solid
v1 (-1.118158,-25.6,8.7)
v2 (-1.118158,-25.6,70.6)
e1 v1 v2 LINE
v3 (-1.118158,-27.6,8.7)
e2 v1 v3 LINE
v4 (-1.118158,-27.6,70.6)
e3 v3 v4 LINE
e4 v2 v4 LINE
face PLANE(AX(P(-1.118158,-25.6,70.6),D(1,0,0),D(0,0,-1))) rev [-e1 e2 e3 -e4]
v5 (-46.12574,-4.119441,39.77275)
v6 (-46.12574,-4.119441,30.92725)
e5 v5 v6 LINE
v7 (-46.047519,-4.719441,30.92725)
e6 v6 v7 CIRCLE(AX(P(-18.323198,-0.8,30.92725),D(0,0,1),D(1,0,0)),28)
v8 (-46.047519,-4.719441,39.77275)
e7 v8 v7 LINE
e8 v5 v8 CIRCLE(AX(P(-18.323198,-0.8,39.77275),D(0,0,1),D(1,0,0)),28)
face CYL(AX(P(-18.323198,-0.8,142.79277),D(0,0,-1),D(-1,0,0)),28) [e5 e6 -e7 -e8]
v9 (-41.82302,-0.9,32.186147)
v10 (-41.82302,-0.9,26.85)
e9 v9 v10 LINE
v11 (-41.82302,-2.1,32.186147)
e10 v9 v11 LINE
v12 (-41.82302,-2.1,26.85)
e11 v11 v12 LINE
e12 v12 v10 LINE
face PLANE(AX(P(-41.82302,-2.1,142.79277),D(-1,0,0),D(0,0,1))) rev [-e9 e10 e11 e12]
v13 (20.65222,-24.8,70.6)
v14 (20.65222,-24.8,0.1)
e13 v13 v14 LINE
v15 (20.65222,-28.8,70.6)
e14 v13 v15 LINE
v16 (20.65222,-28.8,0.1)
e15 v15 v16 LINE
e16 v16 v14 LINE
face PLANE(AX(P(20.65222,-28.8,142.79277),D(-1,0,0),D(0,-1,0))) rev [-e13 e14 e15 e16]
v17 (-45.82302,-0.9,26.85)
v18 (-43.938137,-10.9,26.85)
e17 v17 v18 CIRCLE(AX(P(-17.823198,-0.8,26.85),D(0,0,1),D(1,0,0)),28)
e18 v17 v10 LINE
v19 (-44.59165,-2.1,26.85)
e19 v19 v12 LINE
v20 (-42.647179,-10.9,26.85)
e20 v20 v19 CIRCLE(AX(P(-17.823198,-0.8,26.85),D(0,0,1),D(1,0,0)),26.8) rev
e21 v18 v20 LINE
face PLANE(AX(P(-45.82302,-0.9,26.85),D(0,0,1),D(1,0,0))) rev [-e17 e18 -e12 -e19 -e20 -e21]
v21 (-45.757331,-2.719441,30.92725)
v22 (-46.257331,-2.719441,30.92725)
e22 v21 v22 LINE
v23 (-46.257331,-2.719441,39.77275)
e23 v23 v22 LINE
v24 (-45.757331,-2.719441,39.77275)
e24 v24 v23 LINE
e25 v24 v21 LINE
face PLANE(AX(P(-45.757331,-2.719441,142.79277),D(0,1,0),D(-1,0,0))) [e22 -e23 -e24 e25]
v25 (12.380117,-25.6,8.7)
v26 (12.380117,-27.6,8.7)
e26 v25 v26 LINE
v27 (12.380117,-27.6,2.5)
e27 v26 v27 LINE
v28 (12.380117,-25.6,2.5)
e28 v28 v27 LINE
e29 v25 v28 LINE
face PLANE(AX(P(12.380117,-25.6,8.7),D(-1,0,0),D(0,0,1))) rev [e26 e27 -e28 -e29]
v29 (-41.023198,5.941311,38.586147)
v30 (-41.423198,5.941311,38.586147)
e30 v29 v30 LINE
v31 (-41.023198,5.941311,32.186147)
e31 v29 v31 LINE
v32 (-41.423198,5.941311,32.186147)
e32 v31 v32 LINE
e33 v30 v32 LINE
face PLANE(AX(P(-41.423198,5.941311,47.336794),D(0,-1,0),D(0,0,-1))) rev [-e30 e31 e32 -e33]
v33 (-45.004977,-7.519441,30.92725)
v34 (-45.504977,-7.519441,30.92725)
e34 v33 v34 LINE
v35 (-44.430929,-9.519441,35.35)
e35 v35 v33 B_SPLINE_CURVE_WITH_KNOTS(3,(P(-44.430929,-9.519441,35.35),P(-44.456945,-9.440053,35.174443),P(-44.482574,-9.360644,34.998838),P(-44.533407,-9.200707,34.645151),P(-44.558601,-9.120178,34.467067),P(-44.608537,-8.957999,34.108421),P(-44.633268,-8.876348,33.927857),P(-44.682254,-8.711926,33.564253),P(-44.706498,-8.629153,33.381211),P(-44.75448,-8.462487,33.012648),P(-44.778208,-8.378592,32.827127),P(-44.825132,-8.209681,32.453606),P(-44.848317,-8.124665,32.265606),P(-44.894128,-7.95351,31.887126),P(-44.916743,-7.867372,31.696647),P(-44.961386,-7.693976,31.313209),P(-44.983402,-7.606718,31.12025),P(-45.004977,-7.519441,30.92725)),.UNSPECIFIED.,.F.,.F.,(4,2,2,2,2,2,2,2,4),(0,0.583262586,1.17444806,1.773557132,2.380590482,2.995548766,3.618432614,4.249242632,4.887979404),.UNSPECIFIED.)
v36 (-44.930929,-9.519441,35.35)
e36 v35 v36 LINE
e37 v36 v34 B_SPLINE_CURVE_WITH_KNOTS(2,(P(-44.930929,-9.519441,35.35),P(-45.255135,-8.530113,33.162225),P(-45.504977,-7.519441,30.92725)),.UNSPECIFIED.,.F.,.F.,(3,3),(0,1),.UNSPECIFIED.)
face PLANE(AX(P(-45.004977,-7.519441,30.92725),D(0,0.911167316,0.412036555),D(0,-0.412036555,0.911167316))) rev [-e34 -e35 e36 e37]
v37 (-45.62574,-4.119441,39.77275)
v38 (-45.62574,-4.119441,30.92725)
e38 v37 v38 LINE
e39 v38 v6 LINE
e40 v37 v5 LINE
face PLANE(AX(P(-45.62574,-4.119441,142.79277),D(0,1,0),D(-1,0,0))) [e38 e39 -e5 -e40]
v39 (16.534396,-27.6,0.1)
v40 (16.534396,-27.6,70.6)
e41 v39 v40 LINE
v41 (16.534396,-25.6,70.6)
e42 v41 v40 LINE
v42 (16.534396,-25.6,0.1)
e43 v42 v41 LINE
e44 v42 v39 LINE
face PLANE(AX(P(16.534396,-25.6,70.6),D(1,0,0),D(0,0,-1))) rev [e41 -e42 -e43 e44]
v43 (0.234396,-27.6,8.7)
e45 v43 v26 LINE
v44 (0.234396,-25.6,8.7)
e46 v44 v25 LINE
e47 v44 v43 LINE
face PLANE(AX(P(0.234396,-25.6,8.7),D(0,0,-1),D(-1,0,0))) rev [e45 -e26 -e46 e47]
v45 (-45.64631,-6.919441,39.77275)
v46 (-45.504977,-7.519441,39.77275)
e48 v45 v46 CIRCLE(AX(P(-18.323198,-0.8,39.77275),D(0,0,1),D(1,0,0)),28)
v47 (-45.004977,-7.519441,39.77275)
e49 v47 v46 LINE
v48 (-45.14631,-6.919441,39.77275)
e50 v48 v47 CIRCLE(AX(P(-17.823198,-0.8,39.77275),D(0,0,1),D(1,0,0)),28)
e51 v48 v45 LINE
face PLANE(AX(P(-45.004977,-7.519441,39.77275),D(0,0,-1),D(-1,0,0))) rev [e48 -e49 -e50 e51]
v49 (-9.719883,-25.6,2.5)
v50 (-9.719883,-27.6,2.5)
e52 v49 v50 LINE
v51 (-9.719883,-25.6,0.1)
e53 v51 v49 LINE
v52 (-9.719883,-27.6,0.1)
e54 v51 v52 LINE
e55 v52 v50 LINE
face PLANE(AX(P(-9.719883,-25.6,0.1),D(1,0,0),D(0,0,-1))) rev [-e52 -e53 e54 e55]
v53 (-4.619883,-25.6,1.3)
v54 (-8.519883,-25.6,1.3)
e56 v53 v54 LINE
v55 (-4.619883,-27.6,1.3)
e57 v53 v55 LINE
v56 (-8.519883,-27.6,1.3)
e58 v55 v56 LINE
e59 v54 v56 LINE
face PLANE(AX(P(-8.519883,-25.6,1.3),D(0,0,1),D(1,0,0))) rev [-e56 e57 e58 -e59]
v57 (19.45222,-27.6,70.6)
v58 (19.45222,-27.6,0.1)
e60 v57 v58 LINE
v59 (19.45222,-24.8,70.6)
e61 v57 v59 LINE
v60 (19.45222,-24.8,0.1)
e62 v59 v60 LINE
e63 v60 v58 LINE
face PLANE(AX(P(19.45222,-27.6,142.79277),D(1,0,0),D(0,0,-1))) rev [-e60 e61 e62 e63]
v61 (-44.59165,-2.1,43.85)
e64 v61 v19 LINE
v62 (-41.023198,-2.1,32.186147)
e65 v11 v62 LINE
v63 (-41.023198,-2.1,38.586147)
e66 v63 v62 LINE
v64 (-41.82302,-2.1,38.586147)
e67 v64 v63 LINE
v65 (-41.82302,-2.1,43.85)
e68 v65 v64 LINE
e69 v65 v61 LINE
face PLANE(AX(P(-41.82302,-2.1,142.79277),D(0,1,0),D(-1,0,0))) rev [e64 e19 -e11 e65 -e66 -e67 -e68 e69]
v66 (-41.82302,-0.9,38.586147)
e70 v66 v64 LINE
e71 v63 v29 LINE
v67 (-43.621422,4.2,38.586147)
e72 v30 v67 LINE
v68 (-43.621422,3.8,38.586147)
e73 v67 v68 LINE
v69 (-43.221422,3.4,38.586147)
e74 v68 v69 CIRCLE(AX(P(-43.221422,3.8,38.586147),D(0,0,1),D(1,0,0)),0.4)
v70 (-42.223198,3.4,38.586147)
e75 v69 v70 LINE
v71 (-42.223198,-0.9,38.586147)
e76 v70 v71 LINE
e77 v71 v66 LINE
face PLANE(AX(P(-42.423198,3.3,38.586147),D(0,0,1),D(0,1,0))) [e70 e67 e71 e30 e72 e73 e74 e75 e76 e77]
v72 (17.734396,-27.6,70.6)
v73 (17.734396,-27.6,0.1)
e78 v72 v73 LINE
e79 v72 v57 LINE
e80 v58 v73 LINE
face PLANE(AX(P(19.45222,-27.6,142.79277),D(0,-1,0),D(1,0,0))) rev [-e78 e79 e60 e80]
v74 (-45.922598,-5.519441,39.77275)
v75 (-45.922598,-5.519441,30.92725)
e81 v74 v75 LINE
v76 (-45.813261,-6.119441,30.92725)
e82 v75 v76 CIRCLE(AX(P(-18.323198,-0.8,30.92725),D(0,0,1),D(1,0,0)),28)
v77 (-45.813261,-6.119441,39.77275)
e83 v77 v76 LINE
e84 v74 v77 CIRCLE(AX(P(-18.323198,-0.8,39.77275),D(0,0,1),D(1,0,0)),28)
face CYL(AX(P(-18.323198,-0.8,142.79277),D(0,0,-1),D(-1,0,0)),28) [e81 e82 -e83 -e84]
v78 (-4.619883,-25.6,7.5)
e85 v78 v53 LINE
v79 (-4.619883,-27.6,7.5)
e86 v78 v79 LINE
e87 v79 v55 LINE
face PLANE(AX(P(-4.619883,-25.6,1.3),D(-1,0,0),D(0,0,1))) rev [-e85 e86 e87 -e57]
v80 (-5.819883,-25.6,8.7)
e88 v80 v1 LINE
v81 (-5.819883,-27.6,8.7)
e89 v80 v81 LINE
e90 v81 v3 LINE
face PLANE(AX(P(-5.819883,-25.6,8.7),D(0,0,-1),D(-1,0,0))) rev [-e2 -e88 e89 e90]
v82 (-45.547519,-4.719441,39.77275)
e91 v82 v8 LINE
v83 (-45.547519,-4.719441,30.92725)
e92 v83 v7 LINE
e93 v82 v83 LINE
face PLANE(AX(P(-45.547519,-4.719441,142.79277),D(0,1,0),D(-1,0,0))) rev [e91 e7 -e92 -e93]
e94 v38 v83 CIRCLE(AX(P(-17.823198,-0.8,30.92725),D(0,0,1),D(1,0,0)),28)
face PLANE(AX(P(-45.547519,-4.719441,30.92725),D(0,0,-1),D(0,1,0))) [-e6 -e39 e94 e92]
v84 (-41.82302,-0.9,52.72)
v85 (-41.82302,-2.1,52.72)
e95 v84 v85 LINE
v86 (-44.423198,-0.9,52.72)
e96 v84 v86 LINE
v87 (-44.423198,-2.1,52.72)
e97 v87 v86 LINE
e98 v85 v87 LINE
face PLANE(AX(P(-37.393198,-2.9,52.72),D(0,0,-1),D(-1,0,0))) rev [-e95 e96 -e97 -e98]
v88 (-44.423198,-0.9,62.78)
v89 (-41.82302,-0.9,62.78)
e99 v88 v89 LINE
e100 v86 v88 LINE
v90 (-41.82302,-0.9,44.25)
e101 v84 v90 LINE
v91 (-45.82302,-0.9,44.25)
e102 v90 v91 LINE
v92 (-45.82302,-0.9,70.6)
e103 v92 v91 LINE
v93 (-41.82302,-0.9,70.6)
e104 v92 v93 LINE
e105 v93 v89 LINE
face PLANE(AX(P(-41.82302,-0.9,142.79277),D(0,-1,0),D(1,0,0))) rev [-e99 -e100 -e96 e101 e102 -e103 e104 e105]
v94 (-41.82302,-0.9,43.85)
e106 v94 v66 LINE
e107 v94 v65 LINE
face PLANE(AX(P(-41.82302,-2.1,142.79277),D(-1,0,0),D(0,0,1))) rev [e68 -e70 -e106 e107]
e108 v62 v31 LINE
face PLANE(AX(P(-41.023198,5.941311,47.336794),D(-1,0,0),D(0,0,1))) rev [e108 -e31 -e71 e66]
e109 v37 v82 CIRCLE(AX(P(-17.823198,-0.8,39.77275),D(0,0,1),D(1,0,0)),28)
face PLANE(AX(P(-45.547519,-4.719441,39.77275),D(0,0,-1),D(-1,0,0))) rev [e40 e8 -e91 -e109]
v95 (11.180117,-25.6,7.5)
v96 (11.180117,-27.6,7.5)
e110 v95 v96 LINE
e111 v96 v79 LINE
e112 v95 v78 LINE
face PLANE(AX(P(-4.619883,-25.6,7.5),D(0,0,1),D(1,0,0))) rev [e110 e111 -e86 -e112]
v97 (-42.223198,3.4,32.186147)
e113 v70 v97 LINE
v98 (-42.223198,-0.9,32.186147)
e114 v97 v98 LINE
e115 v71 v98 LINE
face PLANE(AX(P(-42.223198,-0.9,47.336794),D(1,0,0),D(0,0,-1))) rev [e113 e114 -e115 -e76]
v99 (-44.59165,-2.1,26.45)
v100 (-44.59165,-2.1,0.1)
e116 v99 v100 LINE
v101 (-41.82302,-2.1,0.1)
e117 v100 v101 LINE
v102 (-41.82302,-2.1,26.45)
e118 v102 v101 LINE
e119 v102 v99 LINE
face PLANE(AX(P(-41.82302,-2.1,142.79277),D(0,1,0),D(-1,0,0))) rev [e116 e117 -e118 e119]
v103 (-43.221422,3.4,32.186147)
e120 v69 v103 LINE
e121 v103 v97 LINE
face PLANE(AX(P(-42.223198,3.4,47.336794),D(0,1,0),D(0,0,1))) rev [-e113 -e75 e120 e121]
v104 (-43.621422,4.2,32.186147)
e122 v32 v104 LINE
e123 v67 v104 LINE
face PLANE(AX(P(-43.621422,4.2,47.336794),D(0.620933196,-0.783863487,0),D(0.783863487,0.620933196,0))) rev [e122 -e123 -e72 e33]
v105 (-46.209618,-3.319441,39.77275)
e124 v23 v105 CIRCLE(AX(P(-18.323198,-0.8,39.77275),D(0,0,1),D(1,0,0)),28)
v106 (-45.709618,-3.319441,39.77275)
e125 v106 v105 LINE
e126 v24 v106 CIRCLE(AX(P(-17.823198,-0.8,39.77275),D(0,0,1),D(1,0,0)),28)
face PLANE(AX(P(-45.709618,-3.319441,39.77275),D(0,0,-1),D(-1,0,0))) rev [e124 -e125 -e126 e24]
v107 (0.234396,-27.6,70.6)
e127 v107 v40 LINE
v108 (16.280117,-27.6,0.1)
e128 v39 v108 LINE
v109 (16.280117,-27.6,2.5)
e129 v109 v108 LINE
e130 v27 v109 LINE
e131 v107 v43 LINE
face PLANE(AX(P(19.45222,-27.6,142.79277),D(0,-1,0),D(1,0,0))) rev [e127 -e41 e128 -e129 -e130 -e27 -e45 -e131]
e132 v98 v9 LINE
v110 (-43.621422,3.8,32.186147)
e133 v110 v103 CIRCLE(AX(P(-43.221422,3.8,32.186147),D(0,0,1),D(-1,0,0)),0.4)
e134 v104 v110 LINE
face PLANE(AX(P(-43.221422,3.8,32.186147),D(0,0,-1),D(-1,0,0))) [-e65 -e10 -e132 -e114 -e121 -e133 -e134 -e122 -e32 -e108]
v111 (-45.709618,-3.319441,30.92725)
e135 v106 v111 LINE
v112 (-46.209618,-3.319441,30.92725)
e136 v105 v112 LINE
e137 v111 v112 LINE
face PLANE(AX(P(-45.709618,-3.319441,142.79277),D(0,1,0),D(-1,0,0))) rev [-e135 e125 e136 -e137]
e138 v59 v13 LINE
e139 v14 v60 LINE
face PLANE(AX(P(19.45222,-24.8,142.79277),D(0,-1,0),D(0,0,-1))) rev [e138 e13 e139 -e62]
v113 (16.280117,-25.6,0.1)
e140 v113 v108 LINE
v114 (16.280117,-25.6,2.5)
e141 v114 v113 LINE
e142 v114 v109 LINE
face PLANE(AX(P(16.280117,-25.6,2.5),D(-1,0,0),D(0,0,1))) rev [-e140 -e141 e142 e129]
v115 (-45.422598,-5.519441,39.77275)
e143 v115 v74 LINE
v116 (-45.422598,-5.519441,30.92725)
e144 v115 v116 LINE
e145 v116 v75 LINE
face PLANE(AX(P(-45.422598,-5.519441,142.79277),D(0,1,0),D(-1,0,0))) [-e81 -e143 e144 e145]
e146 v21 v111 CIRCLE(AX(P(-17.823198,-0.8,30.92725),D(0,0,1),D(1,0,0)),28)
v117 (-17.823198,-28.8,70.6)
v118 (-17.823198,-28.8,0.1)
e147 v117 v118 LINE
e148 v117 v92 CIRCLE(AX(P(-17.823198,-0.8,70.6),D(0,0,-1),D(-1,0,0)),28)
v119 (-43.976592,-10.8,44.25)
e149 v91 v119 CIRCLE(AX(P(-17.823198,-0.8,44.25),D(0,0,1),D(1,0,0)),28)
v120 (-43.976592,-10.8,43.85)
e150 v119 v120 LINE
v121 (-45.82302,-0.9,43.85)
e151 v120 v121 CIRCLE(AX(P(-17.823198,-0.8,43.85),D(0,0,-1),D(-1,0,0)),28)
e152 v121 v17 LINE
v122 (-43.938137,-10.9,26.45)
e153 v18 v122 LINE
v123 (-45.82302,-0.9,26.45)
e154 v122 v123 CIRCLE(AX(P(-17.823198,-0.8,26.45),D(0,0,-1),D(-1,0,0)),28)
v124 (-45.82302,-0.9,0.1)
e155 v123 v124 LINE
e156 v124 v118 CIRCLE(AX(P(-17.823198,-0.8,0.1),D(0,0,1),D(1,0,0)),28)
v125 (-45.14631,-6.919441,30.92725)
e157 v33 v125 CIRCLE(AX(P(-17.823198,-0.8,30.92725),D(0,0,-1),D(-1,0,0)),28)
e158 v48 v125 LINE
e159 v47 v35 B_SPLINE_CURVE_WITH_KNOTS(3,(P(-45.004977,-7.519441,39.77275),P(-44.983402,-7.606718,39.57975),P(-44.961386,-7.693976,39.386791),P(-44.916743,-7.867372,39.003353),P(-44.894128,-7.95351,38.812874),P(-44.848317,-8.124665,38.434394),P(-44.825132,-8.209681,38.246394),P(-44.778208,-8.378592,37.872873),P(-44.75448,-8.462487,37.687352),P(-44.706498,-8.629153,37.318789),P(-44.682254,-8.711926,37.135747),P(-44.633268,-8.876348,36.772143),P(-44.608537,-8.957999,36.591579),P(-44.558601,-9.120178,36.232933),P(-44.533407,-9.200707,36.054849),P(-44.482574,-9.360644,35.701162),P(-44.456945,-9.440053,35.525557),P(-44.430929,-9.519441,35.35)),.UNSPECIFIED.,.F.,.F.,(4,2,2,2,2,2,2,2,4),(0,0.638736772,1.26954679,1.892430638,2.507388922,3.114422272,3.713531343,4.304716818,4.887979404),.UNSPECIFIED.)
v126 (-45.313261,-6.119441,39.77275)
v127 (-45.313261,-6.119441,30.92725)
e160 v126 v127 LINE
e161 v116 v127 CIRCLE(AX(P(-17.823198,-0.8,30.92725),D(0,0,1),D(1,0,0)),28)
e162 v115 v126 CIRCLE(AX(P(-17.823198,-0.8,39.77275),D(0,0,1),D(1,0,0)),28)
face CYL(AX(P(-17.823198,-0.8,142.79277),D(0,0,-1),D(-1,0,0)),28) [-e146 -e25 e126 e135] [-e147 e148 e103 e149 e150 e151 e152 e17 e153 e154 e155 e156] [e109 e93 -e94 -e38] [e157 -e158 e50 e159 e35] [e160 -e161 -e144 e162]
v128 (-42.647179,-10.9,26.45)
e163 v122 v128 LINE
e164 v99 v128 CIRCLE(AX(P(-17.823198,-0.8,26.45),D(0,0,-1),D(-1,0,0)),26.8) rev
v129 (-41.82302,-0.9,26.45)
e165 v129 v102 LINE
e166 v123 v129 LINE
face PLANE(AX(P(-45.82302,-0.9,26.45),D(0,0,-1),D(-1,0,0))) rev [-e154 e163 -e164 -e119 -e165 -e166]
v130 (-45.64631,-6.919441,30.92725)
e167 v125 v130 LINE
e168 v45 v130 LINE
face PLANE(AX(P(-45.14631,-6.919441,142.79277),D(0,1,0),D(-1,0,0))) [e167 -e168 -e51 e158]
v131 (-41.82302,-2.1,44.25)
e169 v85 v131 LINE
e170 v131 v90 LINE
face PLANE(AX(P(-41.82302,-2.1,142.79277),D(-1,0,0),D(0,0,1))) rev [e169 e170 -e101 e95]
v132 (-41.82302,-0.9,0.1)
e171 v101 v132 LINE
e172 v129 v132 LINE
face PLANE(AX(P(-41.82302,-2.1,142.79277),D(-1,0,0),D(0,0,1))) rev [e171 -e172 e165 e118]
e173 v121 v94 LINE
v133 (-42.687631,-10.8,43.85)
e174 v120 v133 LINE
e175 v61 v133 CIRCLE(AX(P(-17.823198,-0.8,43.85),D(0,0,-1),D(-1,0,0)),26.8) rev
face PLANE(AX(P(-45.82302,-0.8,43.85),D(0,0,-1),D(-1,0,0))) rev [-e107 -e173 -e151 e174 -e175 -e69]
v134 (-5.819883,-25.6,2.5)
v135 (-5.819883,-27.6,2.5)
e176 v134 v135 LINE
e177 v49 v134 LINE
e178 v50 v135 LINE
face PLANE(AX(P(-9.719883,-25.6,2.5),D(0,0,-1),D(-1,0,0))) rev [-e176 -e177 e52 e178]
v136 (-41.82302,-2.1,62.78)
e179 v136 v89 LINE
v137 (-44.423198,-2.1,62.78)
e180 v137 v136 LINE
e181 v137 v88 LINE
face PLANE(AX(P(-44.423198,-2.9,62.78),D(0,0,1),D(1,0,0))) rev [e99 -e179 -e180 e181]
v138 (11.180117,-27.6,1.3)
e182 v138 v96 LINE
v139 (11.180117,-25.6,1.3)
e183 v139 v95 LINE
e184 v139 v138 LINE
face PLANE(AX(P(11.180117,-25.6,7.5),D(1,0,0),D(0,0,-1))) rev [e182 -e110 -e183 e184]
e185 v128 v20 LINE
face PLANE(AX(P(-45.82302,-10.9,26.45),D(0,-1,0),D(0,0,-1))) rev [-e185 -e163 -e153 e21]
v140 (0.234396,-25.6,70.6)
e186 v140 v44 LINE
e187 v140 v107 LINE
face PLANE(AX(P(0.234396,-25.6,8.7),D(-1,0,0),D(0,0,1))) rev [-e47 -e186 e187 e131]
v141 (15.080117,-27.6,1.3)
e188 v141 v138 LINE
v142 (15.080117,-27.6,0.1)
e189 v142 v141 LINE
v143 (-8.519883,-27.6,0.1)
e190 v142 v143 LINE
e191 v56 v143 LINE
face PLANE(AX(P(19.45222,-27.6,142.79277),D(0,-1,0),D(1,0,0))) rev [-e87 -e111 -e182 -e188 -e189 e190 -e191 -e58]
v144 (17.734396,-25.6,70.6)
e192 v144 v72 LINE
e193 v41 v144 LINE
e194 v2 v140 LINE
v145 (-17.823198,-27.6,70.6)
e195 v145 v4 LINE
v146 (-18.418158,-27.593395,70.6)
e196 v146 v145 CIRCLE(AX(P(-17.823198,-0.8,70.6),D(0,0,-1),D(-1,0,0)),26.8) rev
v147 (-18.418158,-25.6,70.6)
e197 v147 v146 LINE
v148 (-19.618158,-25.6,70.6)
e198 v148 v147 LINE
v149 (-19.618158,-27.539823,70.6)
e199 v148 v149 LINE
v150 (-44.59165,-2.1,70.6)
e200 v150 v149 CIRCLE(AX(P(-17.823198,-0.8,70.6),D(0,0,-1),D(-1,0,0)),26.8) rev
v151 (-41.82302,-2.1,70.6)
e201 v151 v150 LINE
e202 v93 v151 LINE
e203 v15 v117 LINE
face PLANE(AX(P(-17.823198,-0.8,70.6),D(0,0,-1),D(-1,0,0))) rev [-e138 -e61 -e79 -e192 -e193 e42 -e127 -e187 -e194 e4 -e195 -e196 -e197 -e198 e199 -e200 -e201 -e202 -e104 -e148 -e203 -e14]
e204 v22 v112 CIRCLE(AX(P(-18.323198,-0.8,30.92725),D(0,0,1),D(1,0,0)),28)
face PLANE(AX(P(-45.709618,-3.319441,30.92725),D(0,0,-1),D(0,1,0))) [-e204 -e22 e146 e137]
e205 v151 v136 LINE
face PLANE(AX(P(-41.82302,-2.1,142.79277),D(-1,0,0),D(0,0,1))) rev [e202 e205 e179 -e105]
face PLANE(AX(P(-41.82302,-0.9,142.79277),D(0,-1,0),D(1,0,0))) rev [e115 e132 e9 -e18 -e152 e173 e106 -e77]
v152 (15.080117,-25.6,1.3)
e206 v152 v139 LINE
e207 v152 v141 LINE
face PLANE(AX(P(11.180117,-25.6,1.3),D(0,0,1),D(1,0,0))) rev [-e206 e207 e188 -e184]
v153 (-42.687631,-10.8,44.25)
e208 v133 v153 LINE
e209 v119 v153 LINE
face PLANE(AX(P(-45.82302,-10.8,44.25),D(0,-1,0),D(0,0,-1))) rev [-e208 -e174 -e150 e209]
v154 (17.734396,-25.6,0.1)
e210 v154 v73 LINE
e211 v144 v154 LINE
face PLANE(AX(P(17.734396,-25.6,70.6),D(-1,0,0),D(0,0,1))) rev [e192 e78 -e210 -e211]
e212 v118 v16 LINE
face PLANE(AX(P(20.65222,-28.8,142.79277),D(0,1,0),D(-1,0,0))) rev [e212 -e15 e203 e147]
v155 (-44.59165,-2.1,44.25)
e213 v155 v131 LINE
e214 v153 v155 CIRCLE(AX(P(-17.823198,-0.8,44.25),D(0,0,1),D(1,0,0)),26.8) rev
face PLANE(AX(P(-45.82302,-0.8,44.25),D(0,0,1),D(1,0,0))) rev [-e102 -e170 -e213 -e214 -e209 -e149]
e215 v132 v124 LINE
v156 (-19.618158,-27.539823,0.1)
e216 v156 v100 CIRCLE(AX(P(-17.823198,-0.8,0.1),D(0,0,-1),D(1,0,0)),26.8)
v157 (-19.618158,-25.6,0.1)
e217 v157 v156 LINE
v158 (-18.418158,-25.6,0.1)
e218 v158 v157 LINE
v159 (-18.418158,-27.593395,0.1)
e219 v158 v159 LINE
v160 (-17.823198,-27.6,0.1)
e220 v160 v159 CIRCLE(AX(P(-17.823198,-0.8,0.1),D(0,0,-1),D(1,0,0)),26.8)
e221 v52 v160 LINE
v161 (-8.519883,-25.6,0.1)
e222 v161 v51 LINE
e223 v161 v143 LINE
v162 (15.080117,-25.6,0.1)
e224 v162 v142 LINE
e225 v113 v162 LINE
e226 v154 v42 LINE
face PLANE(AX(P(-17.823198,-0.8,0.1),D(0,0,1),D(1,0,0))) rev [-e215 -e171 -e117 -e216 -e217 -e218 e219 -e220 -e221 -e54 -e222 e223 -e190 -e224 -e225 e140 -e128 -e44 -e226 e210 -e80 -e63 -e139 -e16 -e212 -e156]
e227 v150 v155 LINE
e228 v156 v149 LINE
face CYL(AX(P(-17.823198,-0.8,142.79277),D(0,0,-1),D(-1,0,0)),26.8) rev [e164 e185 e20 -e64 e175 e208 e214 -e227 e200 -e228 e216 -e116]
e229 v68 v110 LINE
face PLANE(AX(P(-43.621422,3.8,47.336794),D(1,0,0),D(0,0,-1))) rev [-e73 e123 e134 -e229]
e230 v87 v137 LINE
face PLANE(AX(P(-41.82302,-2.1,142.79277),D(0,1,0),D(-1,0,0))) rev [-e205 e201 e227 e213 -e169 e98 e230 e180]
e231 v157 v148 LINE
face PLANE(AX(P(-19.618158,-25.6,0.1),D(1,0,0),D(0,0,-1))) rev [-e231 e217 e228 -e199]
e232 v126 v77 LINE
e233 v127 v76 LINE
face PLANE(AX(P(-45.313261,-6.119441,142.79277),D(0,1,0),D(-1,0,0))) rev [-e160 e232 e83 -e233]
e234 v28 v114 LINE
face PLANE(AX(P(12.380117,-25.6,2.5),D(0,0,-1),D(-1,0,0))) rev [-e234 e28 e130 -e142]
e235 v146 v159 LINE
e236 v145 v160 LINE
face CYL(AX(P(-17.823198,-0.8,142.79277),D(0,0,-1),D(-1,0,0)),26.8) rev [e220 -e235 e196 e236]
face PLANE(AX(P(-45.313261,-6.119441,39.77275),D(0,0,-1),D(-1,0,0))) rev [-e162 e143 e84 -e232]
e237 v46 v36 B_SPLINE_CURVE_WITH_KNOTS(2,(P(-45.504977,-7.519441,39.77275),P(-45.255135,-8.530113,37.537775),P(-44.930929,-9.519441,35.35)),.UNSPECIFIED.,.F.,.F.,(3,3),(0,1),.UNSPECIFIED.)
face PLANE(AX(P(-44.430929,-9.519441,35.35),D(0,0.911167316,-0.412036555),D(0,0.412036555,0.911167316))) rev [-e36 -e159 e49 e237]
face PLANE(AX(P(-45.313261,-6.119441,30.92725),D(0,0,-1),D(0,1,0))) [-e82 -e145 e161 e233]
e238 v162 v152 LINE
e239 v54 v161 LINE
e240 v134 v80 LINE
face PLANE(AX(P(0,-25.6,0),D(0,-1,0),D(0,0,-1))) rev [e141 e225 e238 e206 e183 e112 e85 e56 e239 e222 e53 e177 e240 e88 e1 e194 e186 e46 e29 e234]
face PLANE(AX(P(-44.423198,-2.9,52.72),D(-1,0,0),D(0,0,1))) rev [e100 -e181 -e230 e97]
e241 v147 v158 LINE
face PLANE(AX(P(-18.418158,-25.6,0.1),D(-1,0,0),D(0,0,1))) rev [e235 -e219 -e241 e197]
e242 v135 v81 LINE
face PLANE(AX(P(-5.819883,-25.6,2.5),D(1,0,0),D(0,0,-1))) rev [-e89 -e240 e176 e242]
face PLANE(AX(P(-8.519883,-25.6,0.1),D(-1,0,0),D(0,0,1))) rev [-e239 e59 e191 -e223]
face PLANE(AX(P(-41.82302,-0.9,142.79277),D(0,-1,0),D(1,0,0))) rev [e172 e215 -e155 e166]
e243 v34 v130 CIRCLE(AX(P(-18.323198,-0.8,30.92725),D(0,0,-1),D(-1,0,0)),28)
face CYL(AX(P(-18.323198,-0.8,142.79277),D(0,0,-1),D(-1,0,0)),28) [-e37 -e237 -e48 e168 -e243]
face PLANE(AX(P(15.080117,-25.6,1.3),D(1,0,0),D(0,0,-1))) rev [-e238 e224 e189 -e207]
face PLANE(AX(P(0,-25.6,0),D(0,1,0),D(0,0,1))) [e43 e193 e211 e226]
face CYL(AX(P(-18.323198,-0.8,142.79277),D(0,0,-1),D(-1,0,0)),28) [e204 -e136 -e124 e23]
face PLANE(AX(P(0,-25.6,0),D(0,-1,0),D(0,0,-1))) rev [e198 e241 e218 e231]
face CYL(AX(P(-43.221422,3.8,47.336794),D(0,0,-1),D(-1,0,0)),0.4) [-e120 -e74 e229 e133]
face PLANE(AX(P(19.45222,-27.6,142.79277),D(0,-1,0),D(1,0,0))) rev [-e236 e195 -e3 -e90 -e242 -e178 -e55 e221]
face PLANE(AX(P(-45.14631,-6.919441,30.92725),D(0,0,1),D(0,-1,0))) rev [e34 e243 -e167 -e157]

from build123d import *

# Parameters (mm, degrees)
EXTRUDE_START          = 0.1
EXTRUDE_1_DEPTH        = 70.5
SKETCH_3_W             = 0.4
SKETCH_3_H             = 10
CUT_EXTRUDE_1_DEPTH    = 89.958131389
EXTRUDE_START_2        = 0.3
EXTRUDE_2_DEPTH        = 6.4
EXTRUDE_3_REACH        = 103.657
EXTRUDE_3_START_RADIUS = 28
EXTRUDE_3_END_RADIUS   = 28
SKETCH_5_W             = 8.845499788
SKETCH_5_H             = 0.6
SKETCH_6_W             = 1.2
SKETCH_6_H             = 70.5
EXTRUDE_4_DEPTH        = 2
SKETCH_7_W             = 7.03
SKETCH_7_H             = 10.06
CUT_EXTRUDE_2_DEPTH    = 2


# Read off the part's stored shape, not the designer's step: Бобышка-Вытянуть2
with BuildPart() as part:
    # Эскиз1 → Бобышка-Вытянуть1 (new body)
    with BuildSketch(Plane.XY.offset(EXTRUDE_START)):
        with BuildLine():
            Line((20.652219826, -28.8), (-17.823198335, -28.8))
            ThreePointArc((-17.823198335, -28.8), (-37.586801245, -20.634313701), (-45.823019763, -0.9))
            Line((-45.823019763, -0.9), (-41.823019763, -0.9))
            Line((-41.823019763, -0.9), (-41.823019763, -2.1))
            Line((-41.823019763, -2.1), (-44.591649915, -2.1))
            ThreePointArc((-44.591649915, -2.1), (-36.308327493, -20.204638621), (-17.823198335, -27.6))
            Line((-17.823198335, -27.6), (19.452219826, -27.6))
            Line((19.452219826, -27.6), (19.452219826, -24.8))
            Line((19.452219826, -24.8), (20.652219826, -24.8))
            Line((20.652219826, -24.8), (20.652219826, -28.8))
        make_face()
    extrude(amount=EXTRUDE_1_DEPTH)

    # Эскиз3 → Вырез-Вытянуть1 (cut, through all)
    with BuildSketch(Plane(origin=(0, 0, 0), x_dir=(0, 0, -1), z_dir=(1, 0, 0))):
        with Locations((-44.05, -5.8)):
            Rectangle(SKETCH_3_W, SKETCH_3_H)
        with Locations((-26.65, -5.9)):
            Rectangle(SKETCH_3_W, SKETCH_3_H)
    extrude(amount=-CUT_EXTRUDE_1_DEPTH, mode=Mode.SUBTRACT)

    # Бобышка-Вытянуть2 outline → Бобышка-Вытянуть2 (add)
    with BuildSketch(Plane.XY.offset(31.886146776).offset(EXTRUDE_START_2)):
        with BuildLine():
            Line((-41.823019763, -2.1), (-41.023198335, -2.1))
            Line((-41.023198335, -2.1), (-41.023198335, 5.941310574))
            Line((-41.023198335, 5.941310574), (-41.423198335, 5.941310574))
            Line((-41.423198335, 5.941310574), (-43.62142157, 4.2))
            Line((-43.62142157, 4.2), (-43.62142157, 3.8))
            ThreePointArc((-43.62142157, 3.8), (-43.504264282, 3.517157288), (-43.22142157, 3.4))
            Line((-43.22142157, 3.4), (-42.223198335, 3.4))
            Line((-42.223198335, 3.4), (-42.223198335, -0.9))
            Line((-42.223198335, -0.9), (-41.823019763, -0.9))
            Line((-41.823019763, -0.9), (-41.823019763, -2.1))
        make_face()
    extrude(amount=EXTRUDE_2_DEPTH)

    # Бобышка-Вытянуть3: from a cylinder face, 103.657 long prism both ways, kept between that surface and its translate by the depth
    extrude_3_start = Plane(origin=(-17.823198335, -0.8, 35.35), z_dir=(0, 0, -1)) * Cylinder(EXTRUDE_3_START_RADIUS, 264.314, mode=Mode.PRIVATE)
    extrude_3_end = Plane(origin=(-18.323198335, -0.8, 35.35), z_dir=(0, 0, -1)) * Cylinder(EXTRUDE_3_END_RADIUS, 264.314, mode=Mode.PRIVATE)
    # Эскиз5 → Бобышка-Вытянуть3 (add, from a surface)
    with BuildSketch(Plane.ZY.offset(45.823198335), mode=Mode.PRIVATE) as extrude_3_sk1:
        with Locations((35.35, -3.019441342)):
            Rectangle(SKETCH_5_W, SKETCH_5_H)
    extrude_3_tool1 = extrude(extrude_3_sk1.sketch, amount=EXTRUDE_3_REACH, both=True, mode=Mode.PRIVATE)
    add(((extrude_3_tool1 - extrude_3_start) & extrude_3_end).solids().sort_by_distance((-45.34413, -3.019441, 35.35))[0])
    # Эскиз5 → Бобышка-Вытянуть3 (add, from a surface)
    with BuildSketch(Plane.ZY.offset(45.823198335), mode=Mode.PRIVATE) as extrude_3_sk2:
        with Locations((35.35, -4.419441342)):
            Rectangle(SKETCH_5_W, SKETCH_5_H)
    extrude_3_tool2 = extrude(extrude_3_sk2.sketch, amount=EXTRUDE_3_REACH, both=True, mode=Mode.PRIVATE)
    add(((extrude_3_tool2 - extrude_3_start) & extrude_3_end).solids().sort_by_distance((-45.34413, -3.019441, 35.35))[0])
    # Эскиз5 → Бобышка-Вытянуть3 (add, from a surface)
    with BuildSketch(Plane.ZY.offset(45.823198335), mode=Mode.PRIVATE) as extrude_3_sk3:
        with Locations((35.35, -5.819441342)):
            Rectangle(SKETCH_5_W, SKETCH_5_H)
    extrude_3_tool3 = extrude(extrude_3_sk3.sketch, amount=EXTRUDE_3_REACH, both=True, mode=Mode.PRIVATE)
    add(((extrude_3_tool3 - extrude_3_start) & extrude_3_end).solids().sort_by_distance((-45.34413, -3.019441, 35.35))[0])
    # Эскиз5 → Бобышка-Вытянуть3 (add, from a surface)
    with BuildSketch(Plane.ZY.offset(45.823198335), mode=Mode.PRIVATE) as extrude_3_sk4:
        Polygon((30.927250106, -7.519441342), (35.35, -9.519441342), (39.772749894, -7.519441342), (39.772749894, -6.919441342), (30.927250106, -6.919441342), align=None)
    extrude_3_tool4 = extrude(extrude_3_sk4.sketch, amount=EXTRUDE_3_REACH, both=True, mode=Mode.PRIVATE)
    add(((extrude_3_tool4 - extrude_3_start) & extrude_3_end).solids().sort_by_distance((-45.34413, -3.019441, 35.35))[0])

    # Эскиз6 → Бобышка-Вытянуть4 (add)
    with BuildSketch(Plane(origin=(0, -27.6, 0), x_dir=(1, 0, 0), z_dir=(0, 1, 0))):
        with Locations((-19.018158387, -35.35)):
            Rectangle(SKETCH_6_W, SKETCH_6_H)
        with Locations((17.134396076, -35.35)):
            Rectangle(SKETCH_6_W, SKETCH_6_H)
        Polygon((0.234396076, -8.7), (12.380116687, -8.7), (12.380116687, -2.5), (16.280116687, -2.5), (16.280116687, -0.1), (15.080116687, -0.1), (15.080116687, -1.3), (11.180116687, -1.3), (11.180116687, -7.5), (-4.619883313, -7.5), (-4.619883313, -1.3), (-8.519883313, -1.3), (-8.519883313, -0.1), (-9.719883313, -0.1), (-9.719883313, -2.5), (-5.819883313, -2.5), (-5.819883313, -8.7), (-1.118158387, -8.7), (-1.118158387, -70.6), (0.234396076, -70.6), align=None)
    extrude(amount=EXTRUDE_4_DEPTH)

    # Эскиз7 → Вырез-Вытянуть2 (cut)
    with BuildSketch(Plane(origin=(0, -0.9, 0), x_dir=(1, 0, 0), z_dir=(0, 1, 0))):
        with Locations((-40.908198335, -57.75)):
            Rectangle(SKETCH_7_W, SKETCH_7_H)
    extrude(amount=-CUT_EXTRUDE_2_DEPTH, mode=Mode.SUBTRACT)


solid = part.part
